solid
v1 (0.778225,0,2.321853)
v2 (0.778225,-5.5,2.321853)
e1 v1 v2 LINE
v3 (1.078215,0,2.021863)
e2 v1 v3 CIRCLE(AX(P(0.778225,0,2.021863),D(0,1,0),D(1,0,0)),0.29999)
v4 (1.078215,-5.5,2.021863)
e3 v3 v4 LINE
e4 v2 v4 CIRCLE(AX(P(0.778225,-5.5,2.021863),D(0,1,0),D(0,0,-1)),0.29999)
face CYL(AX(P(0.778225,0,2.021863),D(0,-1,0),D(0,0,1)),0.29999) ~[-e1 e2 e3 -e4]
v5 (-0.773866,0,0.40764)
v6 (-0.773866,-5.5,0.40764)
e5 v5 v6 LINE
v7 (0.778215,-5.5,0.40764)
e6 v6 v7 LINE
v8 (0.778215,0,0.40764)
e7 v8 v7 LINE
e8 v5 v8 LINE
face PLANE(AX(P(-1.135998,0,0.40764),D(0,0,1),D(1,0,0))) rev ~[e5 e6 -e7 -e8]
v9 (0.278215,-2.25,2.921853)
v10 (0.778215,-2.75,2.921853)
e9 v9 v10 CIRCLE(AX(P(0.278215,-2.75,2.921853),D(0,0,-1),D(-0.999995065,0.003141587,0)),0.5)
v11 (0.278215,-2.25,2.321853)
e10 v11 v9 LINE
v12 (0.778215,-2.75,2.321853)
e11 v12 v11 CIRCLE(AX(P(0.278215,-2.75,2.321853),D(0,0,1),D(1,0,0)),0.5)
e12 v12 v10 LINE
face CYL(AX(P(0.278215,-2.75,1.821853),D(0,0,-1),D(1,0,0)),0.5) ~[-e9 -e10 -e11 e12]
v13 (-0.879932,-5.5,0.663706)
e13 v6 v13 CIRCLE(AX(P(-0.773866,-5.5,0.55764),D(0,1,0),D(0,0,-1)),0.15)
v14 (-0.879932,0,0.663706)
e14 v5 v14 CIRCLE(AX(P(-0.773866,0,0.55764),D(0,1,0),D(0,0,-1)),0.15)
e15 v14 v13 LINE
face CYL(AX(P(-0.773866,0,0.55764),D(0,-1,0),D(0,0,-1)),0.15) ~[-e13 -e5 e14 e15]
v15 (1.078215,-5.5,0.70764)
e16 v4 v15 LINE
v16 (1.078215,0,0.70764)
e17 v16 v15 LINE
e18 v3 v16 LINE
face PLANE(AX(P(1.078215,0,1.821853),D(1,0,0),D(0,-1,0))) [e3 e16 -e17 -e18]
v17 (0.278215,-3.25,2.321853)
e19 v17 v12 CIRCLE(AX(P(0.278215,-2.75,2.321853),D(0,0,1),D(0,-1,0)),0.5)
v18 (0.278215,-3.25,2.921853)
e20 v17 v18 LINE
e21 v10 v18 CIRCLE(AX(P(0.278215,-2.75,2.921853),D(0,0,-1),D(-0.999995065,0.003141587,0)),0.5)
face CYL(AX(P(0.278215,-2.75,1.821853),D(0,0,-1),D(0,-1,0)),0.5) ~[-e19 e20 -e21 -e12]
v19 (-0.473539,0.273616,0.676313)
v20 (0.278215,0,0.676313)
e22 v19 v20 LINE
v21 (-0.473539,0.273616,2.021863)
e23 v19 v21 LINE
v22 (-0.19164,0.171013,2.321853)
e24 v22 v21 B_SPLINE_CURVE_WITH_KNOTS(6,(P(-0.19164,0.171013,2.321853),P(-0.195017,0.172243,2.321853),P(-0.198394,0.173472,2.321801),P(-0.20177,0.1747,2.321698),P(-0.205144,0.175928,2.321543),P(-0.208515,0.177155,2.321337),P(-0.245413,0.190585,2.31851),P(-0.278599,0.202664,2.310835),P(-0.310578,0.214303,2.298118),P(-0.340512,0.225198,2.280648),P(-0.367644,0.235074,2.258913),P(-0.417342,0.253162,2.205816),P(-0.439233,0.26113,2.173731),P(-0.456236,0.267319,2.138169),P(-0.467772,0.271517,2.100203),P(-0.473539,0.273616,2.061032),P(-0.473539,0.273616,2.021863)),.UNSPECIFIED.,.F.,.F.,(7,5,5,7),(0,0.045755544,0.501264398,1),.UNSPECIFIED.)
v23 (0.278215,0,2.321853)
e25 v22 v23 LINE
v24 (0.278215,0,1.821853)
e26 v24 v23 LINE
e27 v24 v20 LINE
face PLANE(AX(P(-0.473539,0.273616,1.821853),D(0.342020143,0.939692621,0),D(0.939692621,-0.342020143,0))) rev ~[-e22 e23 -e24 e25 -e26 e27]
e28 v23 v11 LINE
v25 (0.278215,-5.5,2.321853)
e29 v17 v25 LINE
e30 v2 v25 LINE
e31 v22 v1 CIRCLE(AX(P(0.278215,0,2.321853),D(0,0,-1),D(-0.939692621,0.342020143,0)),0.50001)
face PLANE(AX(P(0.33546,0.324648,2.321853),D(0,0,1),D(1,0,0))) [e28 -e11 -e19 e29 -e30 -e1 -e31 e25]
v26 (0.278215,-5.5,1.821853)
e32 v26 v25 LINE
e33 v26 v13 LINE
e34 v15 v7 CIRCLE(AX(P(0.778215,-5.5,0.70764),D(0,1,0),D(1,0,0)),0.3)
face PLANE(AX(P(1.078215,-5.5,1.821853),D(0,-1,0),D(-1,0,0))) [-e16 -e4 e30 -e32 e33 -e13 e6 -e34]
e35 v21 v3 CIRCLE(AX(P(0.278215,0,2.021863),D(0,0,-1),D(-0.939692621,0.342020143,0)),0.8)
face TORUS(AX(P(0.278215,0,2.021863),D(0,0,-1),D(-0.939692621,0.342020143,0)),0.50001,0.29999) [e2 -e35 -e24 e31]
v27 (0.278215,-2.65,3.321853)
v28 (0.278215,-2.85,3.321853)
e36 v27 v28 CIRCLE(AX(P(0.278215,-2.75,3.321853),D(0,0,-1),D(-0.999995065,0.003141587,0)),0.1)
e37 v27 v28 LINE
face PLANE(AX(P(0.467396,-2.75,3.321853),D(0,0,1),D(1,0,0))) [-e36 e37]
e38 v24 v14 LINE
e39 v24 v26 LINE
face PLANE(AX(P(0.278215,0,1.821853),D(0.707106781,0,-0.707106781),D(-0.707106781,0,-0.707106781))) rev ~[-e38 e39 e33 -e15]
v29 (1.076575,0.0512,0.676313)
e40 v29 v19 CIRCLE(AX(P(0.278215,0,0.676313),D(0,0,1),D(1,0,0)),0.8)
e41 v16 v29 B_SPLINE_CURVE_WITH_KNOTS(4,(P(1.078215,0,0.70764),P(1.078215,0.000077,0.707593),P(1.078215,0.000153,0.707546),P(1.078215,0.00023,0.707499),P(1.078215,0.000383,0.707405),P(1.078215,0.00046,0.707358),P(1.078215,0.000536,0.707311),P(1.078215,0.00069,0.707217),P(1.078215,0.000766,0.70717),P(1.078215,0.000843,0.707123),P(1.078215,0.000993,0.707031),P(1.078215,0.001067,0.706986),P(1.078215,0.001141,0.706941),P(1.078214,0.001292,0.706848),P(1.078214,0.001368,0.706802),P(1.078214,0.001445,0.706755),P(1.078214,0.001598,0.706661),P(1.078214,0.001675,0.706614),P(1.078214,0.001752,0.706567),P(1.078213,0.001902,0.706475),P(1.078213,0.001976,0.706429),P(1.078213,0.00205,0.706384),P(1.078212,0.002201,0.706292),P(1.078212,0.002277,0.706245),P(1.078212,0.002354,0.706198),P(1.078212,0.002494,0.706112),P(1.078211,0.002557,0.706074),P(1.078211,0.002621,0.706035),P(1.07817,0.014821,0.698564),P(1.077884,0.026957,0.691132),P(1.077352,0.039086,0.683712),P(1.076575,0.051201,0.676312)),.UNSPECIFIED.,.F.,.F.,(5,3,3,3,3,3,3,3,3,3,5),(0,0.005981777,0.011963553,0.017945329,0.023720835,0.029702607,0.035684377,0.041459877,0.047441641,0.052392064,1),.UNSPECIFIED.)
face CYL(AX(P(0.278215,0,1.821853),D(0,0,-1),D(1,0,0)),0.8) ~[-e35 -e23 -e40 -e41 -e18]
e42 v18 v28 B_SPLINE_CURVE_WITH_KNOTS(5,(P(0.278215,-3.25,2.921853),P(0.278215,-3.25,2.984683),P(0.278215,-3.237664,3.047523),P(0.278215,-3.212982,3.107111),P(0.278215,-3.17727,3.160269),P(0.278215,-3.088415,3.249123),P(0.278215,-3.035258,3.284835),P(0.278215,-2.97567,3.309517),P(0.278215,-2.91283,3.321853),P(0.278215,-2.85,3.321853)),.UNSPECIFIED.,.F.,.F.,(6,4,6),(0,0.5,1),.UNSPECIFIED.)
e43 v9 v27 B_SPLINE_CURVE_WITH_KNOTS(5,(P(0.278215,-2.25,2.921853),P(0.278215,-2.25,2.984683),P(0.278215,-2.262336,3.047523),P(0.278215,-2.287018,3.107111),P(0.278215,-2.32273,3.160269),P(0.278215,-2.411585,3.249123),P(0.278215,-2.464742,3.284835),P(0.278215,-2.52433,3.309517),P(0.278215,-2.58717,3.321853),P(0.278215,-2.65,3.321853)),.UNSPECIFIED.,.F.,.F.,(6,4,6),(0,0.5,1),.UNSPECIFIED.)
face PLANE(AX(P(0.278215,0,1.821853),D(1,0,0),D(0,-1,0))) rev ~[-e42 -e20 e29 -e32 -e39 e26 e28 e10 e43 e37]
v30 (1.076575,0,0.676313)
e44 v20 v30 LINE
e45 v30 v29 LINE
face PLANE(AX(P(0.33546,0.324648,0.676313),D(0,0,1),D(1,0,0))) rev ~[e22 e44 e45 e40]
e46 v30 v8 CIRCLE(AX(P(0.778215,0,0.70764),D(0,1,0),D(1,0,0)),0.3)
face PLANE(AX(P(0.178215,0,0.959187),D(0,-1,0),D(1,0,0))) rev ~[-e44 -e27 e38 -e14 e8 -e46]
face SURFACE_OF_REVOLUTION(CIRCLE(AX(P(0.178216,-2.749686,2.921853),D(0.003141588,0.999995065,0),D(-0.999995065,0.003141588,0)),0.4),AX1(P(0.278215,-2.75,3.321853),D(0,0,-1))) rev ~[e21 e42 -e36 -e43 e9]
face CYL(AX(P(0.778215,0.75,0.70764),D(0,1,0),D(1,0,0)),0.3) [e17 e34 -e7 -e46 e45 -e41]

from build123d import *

# Parameters (mm, degrees)
F1_DEPTH      = 5.5
F3_DEPTH      = 1.14554
F4_T1_DEPTH   = 7
F5_R          = 0.15
F7_DEPTH      = 1.5
F7_DEPTH_BACK = 0.8
F8_T2_ANGLE   = 359.64
F9_DEPTH      = 0.5
F10_R         = 0.29999


# Not quite as in the source:
# - a fillet or chamfer that OpenCascade refuses, or shapes differently, is made with other operations: its cross-section is extruded or revolved along the edge and cut away or added
# - a fillet or chamfer is up to 0.001 mm smaller than in the source, because OpenCascade refuses the exact size


with BuildPart() as f1:
    # F0 (on Front) → F1 (new body)
    with BuildSketch(Plane.XZ):
        Polygon((1.0782154338, 1.8218530951), (0.2782154338, 1.8218530951), (-1.1359981286, 0.4076395328), (1.0782154338, 0.4076395328), align=None)
    extrude(amount=F1_DEPTH)

    # F2 (on face) → F3 (join)
    with BuildSketch(Plane.XY.offset(1.8218530951)):
        with BuildLine():
            Line((-0.4735386629, 0.2736161147), (0.2782154338, 0))
            Line((0.2782154338, 0), (1.0782154338, 0))
            ThreePointArc((1.0782154338, 0), (0.4171339759, 0.7878462024), (-0.4735386629, 0.2736161147))
        make_face()
    extrude(amount=-F3_DEPTH)

    # F4: fillet of radius 0.3 on 1 edges, made by hand

    # F4_s2 → F4_t1 (cut)
    with BuildSketch(Plane.XZ.offset(-0.75)):
        with BuildLine():
            ThreePointArc((1.0782154338, 0.7076395328), (0.9903474681, 0.4955074984), (0.7782154338, 0.4076395328))
            Line((0.7782154338, 0.4076395328), (1.0782154338, 0.4076395328))
            Line((1.0782154338, 0.4076395328), (1.0782154338, 0.7076395328))
        make_face()
    extrude(amount=F4_T1_DEPTH, mode=Mode.SUBTRACT)

    # F5
    f5_edges = [f1.edges().sort_by_distance(p)[0] for p in [
        (-1.135998, -2.75, 0.40764),
    ]]
    fillet(f5_edges, radius=F5_R)

    # F6 (on face) → F7 (join, two sides)
    with BuildSketch(Plane.XY.offset(1.8218530951)) as f7_sk:
        with BuildLine():
            ThreePointArc((0.2782154338, -3.25), (0.6317688243, -3.1035533906), (0.7782154338, -2.75))
            ThreePointArc((0.7782154338, -2.75), (0.6317688243, -2.3964466094), (0.2782154338, -2.25))
            Line((0.2782154338, -2.25), (0.2782154338, -3.25))
        make_face()
    extrude(amount=F7_DEPTH)
    extrude(f7_sk.sketch, amount=-F7_DEPTH_BACK)

    # F8: fillet of radius 0.4 on 1 edges, made by hand

    # F8_s1 → F8_t2 (revolve, cut)
    with BuildSketch(Plane(origin=(-0.0086365771, -2.7490988249, 0), x_dir=(0, 0, 1), z_dir=(-0.0031415875, -0.9999950652, 0))):
        with BuildLine():
            ThreePointArc((2.9218530951, 0.2131465736), (3.2046958076, 0.0959892861), (3.3218530951, -0.1868534264))
            Line((3.3218530951, -0.1868534264), (3.3218530951, 0.2131465736))
            Line((3.3218530951, 0.2131465736), (2.9218530951, 0.2131465736))
        make_face()
    revolve(axis=Axis((0.2782154338, -2.75, 3.3218530951), (0, 0, -1)), revolution_arc=F8_T2_ANGLE, mode=Mode.SUBTRACT)

    # F9 (add): faces of the model
    f9_faces = [f1.faces().sort_by_distance(p)[0] for p in [
        (0.632239132, -2.1810312273, 1.8218530951),
        (0.632239132, -2.1810312273, 1.8218530951),
    ]]
    extrude(f9_faces, amount=F9_DEPTH)

    # F10 (radius 0.3 in the source; OpenCascade refuses exactly that, so slightly less here)
    f10_edges = [f1.edges().sort_by_distance(p)[0] for p in [
        (1.078215, -2.75, 2.321853),
        (0.417134, 0.787846, 2.321853),
    ]]
    fillet(f10_edges, radius=F10_R)


solid = f1.part
